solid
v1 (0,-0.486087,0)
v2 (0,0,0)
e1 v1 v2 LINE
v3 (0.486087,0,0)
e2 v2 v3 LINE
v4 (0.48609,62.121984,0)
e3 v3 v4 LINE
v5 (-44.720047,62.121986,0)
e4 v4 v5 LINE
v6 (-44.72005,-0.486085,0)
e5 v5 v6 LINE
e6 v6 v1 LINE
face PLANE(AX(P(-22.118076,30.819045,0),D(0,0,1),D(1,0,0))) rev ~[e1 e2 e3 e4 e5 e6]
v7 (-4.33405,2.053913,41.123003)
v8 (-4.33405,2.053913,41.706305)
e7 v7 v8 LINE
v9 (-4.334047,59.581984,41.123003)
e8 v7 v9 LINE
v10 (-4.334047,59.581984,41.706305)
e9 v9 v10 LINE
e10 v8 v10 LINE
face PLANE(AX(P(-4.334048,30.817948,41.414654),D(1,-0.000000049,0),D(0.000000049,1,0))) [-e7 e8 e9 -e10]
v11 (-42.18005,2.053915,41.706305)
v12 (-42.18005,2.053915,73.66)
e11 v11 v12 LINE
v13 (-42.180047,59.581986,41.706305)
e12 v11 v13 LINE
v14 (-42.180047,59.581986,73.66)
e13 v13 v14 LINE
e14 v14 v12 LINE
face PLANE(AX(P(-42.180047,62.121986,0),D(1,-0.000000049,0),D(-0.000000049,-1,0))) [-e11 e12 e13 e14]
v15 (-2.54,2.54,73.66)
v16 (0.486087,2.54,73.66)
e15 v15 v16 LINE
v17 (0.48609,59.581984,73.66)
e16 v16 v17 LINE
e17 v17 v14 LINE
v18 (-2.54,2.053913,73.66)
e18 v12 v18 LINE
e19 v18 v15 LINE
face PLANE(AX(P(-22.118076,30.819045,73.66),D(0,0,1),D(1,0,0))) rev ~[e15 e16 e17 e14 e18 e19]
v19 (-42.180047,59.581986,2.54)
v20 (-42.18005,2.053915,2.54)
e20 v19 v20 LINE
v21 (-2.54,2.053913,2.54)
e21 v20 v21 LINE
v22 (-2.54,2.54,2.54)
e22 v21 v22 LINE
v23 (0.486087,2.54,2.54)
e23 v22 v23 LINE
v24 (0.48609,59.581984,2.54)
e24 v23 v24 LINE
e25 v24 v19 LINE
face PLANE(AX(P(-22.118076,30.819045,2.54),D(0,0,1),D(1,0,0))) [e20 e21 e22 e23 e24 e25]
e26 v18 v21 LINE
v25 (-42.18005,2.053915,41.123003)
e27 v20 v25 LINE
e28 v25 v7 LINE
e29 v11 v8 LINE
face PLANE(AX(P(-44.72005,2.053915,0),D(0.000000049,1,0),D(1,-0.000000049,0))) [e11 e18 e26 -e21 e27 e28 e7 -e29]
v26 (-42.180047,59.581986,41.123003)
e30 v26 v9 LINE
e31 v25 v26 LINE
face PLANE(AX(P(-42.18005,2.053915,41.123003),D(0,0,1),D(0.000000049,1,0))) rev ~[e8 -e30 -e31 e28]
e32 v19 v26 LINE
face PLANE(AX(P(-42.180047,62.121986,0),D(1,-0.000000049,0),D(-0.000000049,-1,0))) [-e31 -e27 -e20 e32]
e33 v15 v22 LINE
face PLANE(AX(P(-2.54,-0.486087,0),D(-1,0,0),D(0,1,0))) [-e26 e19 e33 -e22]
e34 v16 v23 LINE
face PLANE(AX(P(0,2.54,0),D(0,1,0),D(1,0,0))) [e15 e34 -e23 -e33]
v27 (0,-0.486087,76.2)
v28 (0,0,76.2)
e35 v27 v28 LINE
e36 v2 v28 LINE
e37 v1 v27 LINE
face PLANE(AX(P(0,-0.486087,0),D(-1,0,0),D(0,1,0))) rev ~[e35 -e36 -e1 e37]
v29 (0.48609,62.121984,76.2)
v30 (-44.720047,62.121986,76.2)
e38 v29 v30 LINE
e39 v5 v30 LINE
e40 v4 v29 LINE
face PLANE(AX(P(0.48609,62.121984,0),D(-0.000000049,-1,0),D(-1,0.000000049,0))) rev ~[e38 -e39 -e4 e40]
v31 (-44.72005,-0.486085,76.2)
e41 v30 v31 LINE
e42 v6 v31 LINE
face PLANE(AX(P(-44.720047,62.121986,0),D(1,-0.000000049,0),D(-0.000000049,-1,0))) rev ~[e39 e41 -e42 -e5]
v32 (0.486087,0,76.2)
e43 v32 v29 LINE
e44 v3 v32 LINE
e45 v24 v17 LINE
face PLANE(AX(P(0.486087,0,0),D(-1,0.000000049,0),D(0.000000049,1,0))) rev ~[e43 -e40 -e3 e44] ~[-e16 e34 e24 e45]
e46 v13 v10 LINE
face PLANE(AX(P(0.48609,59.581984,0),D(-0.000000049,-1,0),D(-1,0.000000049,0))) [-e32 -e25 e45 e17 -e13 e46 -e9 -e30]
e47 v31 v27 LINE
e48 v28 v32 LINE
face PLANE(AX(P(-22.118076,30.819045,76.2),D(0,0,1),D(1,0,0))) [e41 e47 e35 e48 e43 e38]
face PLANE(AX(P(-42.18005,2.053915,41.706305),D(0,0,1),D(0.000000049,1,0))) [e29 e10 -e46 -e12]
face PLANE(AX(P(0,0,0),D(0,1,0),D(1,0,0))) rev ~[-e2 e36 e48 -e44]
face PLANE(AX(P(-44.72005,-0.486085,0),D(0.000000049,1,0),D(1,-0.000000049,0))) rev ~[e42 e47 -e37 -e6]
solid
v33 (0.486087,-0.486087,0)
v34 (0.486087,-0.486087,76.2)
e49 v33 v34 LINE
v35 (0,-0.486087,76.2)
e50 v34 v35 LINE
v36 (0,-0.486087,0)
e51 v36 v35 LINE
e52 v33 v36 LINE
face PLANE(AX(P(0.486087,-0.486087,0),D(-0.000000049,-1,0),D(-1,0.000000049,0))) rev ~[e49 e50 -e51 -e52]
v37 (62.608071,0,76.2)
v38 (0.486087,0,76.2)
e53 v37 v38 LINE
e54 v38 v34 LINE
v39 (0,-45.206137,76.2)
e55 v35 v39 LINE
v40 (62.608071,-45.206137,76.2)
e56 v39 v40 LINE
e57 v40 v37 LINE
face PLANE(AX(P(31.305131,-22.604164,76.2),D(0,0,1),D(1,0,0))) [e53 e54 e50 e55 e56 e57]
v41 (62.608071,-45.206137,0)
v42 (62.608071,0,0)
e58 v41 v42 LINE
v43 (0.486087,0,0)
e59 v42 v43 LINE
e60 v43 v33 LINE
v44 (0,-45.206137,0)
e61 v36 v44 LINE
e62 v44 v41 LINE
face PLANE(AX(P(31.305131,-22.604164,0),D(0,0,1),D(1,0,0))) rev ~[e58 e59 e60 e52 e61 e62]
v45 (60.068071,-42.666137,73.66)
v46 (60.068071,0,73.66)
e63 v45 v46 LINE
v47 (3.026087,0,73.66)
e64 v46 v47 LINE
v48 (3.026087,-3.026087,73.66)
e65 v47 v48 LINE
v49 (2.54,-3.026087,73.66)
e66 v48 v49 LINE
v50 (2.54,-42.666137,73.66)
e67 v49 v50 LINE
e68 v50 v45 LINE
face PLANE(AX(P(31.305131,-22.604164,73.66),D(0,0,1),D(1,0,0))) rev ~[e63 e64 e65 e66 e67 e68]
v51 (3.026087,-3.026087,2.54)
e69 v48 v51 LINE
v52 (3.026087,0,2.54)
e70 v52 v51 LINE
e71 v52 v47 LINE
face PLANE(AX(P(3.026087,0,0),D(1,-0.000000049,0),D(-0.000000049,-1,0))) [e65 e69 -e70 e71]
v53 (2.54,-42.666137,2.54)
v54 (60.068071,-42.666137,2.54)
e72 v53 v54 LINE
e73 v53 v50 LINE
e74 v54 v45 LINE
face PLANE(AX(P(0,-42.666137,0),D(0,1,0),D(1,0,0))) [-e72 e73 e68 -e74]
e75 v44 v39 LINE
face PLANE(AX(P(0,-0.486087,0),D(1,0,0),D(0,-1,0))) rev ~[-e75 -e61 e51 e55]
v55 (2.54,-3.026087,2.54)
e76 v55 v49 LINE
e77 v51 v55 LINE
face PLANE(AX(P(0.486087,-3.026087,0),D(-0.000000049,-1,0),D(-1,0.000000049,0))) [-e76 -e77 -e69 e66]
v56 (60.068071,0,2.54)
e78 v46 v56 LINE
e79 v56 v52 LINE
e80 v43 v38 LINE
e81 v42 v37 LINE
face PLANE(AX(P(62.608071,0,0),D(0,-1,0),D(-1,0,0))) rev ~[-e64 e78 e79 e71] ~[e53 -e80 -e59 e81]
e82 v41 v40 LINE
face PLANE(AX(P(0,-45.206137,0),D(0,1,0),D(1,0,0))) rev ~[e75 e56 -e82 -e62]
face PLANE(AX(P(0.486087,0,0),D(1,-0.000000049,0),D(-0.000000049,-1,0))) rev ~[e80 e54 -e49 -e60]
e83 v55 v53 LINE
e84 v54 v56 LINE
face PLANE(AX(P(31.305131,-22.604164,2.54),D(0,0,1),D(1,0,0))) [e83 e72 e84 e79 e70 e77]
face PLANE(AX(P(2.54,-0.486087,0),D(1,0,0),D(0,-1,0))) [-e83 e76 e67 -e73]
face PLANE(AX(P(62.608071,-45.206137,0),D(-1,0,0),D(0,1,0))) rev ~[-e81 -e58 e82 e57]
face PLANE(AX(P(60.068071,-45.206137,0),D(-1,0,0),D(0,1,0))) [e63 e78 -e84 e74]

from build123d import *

# Parameters (mm, degrees)
F1_DEPTH = 76.2
F2_T     = -2.54
F3_T     = -2.54
F4_W     = 57.5280706716
F4_H     = 0.5833022296
F5_DEPTH = 37.846


# Not quite as in the source:
# - the program builds the solid bodies; features that only make, move or delete a surface that nothing else refers to are left out


with BuildPart() as f1:
    # F0 (on Top) → F1 (new body)
    with BuildSketch(Plane.XY):
        Polygon((0, -0.486087054), (0, 0), (0.4860870778, 0), (0.4860901141, 62.1219835938), (-44.7200468874, 62.1219858033), (-44.7200499475, -0.4860848683), align=None)
    extrude(amount=F1_DEPTH)

    # F2
    f2_openings = [f1.faces().sort_by_distance(p)[0] for p in [
        (0.486089, 31.060992, 38.1),
    ]]
    offset(amount=F2_T, openings=f2_openings, kind=Kind.INTERSECTION)

    # F4 (on face) → F5 (join)
    with BuildSketch(Plane(origin=(-42.1800499237, 2.0616e-06, 0), x_dir=(4.89e-08, 1, 0), z_dir=(1, -4.89e-08, 0))):
        with Locations((30.8179482818, 41.4146538824)):
            Rectangle(F4_W, F4_H)
    extrude(amount=F5_DEPTH)


with BuildPart() as f1b:
    # F0 (on Top) → F1, piece 2 (new body)
    with BuildSketch(Plane.XY):
        Polygon((62.6080706716, 0), (0.4860870778, 0), (0.486087054, -0.4860870778), (0, -0.486087054), (0, -45.2061370015), (62.6080706716, -45.2061370015), align=None)
    extrude(amount=F1_DEPTH)

    # F3
    f3_openings = [f1b.faces().sort_by_distance(p)[0] for p in [
        (31.547079, 0, 38.1),
    ]]
    offset(amount=F3_T, openings=f3_openings, kind=Kind.INTERSECTION)


solid = Compound([f1.part, f1b.part])
